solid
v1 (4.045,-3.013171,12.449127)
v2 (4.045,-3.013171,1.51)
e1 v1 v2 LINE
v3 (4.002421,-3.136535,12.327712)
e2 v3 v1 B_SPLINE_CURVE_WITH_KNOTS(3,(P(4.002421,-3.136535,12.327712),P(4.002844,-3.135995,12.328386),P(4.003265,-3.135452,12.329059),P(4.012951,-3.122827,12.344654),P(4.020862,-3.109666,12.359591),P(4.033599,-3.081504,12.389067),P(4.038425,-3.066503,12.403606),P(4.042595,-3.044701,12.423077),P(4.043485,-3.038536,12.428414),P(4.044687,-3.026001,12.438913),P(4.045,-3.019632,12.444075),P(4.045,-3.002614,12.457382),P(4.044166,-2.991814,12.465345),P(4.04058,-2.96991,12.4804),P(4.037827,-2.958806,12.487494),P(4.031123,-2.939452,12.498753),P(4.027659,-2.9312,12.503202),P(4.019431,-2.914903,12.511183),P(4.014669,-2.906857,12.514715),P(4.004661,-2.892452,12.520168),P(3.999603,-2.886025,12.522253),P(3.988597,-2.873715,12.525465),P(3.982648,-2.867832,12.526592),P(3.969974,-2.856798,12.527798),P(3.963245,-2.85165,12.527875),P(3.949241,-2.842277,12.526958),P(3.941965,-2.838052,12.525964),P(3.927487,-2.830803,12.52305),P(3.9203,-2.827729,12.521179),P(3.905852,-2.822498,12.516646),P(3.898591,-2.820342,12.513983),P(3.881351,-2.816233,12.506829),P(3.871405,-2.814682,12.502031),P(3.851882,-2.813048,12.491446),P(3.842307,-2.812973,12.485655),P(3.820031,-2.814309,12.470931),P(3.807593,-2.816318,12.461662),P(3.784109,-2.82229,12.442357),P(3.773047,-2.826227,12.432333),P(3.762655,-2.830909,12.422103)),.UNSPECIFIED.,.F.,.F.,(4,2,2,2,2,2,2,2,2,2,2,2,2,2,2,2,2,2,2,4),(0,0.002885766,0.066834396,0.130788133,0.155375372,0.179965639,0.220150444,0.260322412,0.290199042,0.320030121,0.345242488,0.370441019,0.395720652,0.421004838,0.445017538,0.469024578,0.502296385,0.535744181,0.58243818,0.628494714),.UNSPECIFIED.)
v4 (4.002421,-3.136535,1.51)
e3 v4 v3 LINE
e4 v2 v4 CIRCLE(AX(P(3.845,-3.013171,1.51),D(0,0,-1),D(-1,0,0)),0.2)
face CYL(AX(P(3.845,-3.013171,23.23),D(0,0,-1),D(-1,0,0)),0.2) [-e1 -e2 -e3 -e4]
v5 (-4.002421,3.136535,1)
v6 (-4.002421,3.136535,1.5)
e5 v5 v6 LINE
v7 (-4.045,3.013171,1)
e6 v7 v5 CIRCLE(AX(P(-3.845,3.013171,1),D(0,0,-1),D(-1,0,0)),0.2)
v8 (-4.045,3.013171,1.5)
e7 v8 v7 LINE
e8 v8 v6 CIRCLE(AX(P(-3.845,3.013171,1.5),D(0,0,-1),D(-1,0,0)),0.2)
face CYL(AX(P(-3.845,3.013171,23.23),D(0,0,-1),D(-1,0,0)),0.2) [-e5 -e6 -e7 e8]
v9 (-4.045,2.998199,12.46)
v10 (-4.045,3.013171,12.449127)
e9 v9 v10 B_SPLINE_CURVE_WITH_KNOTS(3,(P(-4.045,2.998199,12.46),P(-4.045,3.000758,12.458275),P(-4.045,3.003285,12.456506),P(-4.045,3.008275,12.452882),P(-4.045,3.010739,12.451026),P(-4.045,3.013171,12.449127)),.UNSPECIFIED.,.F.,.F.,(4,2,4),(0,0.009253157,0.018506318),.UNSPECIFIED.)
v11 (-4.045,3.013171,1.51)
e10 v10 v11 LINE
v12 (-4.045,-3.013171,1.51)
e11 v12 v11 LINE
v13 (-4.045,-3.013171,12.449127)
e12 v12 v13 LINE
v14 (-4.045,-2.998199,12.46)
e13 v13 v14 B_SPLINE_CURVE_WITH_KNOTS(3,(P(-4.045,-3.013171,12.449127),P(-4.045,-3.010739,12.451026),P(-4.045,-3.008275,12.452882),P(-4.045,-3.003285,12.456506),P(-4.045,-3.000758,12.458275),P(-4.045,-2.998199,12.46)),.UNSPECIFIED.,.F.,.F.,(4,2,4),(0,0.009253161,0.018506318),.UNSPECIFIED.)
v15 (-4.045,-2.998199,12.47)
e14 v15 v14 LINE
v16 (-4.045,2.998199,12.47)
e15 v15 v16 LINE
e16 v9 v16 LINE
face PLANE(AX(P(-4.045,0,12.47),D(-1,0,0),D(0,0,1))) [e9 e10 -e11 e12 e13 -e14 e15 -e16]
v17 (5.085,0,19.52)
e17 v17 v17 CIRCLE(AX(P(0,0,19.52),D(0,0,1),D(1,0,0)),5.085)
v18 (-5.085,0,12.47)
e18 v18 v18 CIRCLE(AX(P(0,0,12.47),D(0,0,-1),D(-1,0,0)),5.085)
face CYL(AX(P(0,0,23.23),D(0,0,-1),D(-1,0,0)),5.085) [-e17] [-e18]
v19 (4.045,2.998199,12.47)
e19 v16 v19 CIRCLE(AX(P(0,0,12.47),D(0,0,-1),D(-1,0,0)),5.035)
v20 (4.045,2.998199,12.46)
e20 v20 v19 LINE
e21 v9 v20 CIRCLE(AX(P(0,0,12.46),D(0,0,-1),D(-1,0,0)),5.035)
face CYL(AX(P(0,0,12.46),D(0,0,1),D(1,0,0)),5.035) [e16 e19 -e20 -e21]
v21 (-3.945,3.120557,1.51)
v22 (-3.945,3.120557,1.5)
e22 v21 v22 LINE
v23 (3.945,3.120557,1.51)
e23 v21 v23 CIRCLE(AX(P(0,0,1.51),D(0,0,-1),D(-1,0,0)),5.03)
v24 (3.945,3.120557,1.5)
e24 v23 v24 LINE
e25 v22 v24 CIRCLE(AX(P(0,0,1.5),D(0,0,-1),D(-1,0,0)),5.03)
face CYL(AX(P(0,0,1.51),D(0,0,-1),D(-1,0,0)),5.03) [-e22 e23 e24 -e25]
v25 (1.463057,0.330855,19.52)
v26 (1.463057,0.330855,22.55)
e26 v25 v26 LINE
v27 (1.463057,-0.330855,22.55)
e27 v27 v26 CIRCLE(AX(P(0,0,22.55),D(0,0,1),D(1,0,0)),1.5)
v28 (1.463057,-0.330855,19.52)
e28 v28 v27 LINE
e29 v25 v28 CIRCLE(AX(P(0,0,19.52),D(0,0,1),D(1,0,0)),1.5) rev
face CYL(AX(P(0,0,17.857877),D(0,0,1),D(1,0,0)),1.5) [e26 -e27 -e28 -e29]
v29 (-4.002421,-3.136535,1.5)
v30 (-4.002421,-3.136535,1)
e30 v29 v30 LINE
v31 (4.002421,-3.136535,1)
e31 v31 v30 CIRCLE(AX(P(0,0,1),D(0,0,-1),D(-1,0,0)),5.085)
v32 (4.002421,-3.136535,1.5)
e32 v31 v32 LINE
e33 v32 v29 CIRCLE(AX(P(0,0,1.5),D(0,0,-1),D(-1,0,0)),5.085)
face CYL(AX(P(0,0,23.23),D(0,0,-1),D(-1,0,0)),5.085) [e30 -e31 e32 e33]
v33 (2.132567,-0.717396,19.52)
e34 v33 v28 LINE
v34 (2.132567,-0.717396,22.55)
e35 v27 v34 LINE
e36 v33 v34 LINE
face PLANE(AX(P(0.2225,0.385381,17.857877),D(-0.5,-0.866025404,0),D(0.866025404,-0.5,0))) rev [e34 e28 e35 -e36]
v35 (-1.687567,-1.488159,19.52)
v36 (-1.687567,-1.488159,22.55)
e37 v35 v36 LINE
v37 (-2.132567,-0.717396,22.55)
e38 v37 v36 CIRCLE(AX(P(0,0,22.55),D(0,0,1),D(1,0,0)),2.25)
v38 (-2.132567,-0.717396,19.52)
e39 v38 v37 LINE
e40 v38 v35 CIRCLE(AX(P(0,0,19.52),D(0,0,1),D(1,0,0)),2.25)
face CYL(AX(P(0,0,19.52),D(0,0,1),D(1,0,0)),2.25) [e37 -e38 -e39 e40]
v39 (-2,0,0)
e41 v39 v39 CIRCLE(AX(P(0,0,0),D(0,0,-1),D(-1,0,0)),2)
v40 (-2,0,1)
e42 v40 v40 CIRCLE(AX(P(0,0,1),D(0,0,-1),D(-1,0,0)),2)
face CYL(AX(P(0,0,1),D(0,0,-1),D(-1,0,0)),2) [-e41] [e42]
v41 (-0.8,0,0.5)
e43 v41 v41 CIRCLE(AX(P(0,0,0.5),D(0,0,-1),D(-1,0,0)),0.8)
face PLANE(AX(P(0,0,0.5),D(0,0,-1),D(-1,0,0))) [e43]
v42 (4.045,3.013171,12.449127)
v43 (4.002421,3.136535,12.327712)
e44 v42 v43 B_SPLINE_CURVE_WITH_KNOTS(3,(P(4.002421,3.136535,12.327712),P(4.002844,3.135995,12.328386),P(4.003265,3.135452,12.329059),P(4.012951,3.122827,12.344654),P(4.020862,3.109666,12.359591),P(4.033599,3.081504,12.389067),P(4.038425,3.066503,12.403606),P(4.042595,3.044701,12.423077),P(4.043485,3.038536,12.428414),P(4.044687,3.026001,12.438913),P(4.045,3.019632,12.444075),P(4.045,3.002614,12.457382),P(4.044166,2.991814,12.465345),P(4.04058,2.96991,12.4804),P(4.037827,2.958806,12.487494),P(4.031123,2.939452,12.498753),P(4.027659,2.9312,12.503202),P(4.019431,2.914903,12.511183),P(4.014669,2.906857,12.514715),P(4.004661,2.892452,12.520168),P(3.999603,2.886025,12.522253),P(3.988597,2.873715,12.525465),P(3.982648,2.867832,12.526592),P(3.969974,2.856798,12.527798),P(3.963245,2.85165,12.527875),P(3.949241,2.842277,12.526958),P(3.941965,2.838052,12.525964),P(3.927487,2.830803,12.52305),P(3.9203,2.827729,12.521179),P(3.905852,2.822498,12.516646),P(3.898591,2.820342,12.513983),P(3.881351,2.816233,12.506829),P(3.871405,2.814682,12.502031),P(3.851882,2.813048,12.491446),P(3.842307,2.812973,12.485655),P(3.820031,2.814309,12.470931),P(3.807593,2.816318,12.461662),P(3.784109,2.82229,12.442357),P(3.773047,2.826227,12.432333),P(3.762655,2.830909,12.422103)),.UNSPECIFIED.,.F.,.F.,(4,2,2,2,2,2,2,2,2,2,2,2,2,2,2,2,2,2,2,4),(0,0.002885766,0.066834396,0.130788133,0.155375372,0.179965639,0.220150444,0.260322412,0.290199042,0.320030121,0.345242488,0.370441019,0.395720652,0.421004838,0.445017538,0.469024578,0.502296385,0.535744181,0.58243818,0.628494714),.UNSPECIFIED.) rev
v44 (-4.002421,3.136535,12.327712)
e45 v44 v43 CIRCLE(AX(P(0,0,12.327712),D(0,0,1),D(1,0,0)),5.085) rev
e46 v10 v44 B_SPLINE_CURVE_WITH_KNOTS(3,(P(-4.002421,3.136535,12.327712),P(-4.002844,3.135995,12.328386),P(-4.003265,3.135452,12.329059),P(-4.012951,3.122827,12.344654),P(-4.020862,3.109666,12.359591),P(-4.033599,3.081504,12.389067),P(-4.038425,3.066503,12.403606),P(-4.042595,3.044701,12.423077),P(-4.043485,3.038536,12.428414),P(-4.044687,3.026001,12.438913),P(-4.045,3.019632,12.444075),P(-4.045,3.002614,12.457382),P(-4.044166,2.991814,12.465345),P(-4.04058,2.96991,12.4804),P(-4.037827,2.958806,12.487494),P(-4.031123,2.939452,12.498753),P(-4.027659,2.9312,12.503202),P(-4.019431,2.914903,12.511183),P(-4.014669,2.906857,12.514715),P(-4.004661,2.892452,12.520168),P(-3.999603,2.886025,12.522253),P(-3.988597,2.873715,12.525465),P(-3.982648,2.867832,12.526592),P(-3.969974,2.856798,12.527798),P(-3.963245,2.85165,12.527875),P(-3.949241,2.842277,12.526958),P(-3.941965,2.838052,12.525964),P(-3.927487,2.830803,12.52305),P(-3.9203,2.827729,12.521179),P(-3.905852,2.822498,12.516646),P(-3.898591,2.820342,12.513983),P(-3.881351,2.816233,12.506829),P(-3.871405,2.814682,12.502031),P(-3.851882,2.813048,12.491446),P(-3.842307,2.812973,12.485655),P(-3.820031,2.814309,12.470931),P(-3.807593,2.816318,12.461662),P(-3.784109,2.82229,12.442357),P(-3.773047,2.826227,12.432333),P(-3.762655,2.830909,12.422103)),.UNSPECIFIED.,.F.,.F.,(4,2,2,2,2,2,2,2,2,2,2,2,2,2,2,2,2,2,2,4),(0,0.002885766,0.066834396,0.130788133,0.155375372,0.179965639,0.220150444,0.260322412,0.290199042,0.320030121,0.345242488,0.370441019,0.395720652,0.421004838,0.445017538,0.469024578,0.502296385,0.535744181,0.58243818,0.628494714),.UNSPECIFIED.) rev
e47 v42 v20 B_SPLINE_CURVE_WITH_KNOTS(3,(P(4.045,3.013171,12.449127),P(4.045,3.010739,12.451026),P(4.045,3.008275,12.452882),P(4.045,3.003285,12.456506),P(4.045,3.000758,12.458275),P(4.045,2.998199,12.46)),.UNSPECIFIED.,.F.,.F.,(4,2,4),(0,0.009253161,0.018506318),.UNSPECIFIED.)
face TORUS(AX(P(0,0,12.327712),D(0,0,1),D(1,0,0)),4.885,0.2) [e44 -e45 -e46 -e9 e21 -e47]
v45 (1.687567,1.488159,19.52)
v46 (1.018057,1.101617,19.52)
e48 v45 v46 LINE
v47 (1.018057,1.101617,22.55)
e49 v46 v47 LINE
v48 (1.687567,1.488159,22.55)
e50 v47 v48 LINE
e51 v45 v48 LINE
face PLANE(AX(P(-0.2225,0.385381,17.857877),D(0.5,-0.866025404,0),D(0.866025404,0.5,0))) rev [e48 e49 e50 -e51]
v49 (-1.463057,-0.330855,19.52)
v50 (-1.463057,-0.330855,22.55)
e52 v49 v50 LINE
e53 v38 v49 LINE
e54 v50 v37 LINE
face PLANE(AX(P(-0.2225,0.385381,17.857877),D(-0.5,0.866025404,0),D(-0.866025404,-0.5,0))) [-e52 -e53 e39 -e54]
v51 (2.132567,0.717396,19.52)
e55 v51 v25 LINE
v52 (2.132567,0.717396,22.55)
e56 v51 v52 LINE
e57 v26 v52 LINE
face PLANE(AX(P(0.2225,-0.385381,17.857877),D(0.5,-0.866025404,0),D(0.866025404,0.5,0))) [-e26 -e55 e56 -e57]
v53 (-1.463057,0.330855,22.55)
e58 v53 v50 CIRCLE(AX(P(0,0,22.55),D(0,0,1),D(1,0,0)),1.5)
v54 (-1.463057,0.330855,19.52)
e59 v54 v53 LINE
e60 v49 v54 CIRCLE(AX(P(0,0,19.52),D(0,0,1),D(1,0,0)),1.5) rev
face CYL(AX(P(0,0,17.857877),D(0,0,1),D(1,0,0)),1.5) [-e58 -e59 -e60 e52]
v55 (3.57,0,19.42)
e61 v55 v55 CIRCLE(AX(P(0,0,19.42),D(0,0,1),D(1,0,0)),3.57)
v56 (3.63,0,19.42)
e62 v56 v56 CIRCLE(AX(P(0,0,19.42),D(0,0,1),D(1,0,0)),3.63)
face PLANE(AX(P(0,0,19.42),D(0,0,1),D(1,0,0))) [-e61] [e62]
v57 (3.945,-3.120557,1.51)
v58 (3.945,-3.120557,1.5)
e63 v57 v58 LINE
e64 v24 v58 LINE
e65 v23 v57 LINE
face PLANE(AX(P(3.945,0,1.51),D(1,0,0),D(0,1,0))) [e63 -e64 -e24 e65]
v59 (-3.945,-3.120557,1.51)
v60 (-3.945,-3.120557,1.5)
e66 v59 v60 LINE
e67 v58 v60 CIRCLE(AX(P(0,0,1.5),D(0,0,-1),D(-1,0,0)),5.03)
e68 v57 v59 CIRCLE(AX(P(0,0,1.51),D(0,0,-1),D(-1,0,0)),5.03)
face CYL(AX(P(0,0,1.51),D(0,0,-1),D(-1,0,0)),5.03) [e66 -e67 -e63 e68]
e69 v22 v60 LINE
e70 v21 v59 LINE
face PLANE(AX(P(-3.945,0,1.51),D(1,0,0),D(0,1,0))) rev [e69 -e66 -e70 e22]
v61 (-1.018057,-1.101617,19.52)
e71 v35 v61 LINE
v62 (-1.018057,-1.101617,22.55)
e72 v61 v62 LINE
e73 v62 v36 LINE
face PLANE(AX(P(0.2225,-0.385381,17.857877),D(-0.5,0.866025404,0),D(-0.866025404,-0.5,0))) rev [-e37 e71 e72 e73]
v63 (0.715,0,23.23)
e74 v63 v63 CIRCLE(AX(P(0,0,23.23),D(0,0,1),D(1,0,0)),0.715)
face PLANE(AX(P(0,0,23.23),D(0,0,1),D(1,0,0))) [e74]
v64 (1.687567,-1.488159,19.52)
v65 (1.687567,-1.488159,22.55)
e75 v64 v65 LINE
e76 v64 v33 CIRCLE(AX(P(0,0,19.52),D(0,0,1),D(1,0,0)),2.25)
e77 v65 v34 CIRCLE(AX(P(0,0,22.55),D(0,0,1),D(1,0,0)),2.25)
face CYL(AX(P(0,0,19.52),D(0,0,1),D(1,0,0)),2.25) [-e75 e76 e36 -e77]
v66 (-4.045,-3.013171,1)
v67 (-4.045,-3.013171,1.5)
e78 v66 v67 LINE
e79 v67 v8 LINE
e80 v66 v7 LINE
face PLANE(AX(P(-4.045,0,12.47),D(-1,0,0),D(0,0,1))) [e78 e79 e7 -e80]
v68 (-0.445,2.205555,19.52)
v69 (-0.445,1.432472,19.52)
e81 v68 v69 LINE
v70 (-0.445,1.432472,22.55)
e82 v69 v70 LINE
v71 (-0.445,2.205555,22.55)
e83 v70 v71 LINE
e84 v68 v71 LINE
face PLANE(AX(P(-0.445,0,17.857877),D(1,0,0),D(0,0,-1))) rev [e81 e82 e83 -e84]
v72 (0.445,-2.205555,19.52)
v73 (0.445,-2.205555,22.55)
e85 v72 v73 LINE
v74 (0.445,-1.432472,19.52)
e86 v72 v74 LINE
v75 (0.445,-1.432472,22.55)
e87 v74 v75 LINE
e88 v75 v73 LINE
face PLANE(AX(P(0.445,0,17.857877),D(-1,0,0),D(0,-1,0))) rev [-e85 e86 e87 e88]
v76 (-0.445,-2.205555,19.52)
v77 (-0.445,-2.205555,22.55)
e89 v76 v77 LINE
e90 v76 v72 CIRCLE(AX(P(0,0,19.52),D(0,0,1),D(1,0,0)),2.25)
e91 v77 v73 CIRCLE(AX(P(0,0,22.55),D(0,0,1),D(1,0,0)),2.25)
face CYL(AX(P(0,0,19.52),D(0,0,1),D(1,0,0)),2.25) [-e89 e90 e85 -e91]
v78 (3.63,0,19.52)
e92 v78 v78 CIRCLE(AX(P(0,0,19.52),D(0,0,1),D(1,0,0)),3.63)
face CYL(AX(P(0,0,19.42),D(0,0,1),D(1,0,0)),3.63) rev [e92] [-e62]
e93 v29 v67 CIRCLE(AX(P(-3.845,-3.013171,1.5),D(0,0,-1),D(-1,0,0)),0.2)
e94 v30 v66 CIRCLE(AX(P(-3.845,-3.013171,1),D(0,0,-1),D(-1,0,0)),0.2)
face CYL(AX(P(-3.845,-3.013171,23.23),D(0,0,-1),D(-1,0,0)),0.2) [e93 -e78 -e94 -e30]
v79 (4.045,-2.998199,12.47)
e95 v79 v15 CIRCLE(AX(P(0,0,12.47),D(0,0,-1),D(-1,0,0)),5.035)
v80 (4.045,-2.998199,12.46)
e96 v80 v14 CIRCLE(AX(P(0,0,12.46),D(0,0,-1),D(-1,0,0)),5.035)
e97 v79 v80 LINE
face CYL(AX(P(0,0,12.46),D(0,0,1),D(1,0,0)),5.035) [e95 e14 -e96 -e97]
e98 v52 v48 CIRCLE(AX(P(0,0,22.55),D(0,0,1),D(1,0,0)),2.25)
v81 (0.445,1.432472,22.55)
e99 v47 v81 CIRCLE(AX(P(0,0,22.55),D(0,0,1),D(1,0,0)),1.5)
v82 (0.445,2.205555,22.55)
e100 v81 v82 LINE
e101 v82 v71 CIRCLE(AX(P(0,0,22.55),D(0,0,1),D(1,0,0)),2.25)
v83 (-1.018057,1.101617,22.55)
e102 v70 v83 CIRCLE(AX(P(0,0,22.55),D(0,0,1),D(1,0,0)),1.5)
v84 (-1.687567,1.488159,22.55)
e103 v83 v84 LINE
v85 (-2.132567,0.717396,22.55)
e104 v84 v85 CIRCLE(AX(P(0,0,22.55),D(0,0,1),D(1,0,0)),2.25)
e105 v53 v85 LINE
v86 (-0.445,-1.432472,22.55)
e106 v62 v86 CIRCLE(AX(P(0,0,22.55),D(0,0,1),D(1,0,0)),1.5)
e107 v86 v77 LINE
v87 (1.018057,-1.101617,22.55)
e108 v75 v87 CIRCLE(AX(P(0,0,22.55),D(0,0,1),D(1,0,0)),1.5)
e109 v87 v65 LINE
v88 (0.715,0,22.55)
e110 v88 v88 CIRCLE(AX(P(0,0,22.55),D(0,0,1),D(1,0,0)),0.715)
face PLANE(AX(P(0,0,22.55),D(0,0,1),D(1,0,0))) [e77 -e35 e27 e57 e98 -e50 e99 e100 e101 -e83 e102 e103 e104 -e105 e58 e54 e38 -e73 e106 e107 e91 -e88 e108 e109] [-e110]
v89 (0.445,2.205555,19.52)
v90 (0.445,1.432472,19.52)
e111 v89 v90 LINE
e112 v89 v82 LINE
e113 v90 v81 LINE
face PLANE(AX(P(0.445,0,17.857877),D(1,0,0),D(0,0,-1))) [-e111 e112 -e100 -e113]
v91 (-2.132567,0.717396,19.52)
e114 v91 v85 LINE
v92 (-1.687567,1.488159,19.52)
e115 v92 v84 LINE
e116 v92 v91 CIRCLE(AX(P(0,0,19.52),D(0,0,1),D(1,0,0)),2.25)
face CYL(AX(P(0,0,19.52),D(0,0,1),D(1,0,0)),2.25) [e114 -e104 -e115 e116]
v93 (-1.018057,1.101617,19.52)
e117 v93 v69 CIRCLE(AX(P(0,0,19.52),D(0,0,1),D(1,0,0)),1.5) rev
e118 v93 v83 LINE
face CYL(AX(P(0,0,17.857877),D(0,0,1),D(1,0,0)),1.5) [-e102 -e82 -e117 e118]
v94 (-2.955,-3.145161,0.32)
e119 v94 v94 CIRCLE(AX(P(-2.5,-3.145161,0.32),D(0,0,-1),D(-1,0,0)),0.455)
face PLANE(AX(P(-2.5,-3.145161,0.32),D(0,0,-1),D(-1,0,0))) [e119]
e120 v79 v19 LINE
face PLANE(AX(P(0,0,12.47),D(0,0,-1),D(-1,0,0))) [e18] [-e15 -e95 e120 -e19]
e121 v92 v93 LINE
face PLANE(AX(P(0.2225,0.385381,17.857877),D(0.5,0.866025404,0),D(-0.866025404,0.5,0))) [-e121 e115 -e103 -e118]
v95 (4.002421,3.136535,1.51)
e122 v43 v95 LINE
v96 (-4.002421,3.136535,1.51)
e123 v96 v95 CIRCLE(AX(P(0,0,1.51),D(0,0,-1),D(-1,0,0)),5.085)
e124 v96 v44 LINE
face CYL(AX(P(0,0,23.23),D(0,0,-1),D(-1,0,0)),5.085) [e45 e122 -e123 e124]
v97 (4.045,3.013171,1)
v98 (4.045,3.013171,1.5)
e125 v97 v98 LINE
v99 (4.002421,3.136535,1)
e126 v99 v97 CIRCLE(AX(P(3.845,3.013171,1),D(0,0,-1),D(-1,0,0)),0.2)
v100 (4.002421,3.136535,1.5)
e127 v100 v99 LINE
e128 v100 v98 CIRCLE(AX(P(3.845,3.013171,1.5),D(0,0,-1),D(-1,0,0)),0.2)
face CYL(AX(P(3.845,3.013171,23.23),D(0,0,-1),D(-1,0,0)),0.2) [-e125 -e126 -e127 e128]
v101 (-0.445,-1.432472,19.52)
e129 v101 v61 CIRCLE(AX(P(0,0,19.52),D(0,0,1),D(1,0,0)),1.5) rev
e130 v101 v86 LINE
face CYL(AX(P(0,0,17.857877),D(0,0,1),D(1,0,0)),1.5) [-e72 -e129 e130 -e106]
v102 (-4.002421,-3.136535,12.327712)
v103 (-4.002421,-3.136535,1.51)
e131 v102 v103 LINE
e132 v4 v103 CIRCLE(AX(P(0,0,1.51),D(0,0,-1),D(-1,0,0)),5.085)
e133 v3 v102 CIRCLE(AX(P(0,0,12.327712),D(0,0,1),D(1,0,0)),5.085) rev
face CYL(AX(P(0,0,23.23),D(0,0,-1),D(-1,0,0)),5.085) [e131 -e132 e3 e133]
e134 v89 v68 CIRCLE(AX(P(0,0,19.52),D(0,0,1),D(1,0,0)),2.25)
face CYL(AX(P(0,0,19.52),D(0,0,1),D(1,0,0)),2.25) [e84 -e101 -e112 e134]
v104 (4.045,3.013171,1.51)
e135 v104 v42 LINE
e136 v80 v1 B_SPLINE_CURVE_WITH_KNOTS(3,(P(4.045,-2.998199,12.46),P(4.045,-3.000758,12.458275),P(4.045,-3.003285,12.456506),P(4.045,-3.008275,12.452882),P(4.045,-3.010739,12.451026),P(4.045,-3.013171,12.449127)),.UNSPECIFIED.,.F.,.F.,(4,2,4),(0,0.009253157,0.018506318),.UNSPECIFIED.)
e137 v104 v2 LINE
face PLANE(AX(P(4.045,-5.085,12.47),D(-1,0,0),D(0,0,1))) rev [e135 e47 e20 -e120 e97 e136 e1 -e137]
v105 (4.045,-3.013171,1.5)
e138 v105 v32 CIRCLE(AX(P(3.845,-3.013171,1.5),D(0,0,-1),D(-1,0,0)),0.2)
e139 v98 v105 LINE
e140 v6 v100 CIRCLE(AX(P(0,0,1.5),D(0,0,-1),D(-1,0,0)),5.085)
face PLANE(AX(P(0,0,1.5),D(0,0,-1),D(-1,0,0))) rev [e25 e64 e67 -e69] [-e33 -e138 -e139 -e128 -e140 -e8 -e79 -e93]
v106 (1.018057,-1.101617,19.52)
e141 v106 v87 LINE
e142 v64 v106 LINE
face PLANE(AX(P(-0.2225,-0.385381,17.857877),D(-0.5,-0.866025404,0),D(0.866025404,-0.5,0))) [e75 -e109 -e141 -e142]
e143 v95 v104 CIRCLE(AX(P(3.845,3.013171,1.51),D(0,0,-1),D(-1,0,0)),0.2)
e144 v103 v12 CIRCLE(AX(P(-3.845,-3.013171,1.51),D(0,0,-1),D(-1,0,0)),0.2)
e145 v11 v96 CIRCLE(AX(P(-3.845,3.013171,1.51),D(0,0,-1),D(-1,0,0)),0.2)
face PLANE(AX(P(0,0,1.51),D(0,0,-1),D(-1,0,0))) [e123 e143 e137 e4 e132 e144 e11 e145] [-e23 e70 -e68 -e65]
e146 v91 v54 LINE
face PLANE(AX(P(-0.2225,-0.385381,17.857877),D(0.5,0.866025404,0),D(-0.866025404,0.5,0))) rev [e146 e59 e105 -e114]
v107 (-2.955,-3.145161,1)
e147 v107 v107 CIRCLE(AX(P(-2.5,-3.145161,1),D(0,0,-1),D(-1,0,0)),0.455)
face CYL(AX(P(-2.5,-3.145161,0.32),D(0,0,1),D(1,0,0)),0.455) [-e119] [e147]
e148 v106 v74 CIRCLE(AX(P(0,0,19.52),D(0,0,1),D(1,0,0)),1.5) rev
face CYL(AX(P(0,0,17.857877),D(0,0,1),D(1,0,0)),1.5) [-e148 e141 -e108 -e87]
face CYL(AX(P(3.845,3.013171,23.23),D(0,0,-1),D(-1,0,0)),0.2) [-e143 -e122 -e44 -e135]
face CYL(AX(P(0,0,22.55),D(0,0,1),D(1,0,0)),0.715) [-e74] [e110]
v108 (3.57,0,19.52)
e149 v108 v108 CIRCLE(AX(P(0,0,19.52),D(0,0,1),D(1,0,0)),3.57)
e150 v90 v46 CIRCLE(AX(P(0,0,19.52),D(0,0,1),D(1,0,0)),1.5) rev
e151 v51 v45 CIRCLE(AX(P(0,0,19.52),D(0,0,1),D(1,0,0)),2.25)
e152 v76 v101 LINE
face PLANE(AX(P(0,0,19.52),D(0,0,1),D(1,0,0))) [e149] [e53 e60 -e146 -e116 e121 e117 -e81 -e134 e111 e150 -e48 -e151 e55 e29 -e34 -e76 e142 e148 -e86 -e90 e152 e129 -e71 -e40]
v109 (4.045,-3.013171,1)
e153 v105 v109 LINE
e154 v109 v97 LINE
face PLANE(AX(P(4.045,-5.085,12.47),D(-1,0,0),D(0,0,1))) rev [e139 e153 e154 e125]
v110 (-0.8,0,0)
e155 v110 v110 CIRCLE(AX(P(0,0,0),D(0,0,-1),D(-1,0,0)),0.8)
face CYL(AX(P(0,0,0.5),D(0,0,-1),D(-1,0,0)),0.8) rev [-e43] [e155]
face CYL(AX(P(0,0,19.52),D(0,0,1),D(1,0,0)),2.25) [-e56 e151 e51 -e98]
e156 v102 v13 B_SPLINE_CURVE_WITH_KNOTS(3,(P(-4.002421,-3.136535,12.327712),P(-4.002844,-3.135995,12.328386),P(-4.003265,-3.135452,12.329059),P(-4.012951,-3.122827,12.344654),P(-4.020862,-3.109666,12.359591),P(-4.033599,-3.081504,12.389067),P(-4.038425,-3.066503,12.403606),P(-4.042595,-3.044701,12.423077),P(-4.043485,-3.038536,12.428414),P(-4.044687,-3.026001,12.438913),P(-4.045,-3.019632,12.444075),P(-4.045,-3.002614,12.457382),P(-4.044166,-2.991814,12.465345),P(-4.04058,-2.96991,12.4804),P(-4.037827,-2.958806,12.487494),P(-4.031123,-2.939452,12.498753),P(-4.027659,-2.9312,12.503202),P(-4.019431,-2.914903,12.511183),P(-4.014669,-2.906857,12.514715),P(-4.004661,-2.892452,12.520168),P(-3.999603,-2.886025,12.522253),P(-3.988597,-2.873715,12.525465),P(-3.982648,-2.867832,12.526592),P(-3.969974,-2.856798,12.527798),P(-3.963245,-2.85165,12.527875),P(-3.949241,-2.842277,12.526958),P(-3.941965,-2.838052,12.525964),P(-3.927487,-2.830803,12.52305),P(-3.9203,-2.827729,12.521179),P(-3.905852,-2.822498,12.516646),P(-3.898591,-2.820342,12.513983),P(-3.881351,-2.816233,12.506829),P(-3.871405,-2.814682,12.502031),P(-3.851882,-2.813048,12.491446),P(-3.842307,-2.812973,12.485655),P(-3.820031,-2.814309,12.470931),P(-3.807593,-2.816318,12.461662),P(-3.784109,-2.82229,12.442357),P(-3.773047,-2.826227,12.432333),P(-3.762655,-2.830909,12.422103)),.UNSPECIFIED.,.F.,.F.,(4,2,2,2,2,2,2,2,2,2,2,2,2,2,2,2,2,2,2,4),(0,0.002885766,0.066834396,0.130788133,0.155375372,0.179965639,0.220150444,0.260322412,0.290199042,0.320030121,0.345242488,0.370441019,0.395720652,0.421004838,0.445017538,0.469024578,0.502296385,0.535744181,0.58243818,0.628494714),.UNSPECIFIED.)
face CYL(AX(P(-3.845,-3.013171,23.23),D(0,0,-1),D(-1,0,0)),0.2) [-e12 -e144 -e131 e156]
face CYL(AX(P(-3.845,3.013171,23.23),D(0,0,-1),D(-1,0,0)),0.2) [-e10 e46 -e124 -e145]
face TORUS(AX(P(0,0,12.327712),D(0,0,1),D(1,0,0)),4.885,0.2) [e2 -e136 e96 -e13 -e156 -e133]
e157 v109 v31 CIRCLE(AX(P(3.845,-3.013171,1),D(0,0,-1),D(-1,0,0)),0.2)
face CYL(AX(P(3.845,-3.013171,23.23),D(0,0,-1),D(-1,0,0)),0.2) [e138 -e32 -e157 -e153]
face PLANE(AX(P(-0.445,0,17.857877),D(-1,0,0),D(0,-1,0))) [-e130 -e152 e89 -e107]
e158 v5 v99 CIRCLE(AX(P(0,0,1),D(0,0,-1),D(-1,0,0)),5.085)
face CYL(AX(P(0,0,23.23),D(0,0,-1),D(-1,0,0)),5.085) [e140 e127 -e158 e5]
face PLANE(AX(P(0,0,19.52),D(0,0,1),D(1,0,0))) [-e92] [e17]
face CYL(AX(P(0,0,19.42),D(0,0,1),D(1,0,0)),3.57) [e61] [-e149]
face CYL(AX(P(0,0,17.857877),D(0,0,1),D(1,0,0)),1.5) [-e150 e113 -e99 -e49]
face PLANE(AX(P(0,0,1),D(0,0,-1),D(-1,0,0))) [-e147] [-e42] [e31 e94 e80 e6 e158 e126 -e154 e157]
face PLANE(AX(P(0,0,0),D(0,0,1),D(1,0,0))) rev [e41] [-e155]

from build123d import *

# Parameters (mm, degrees)
SKETCH1_R           = 5.085
BOSS_EXTRUDE1_DEPTH = 23.23
SKETCH2_R           = 5.085
SKETCH2_R_2         = 2
CUT_EXTRUDE1_DEPTH  = 1
SKETCH4_R           = 0.8
CUT_EXTRUDE2_DEPTH  = 0.5
SKETCH5_W           = 3.99879876
SKETCH5_H           = 10.17
SKETCH5_W_2         = 3.491908776
CUT_EXTRUDE3_DEPTH  = 12.47
CUT_EXTRUDE4_START  = -3.71
SKETCH6_R           = 5.085
SKETCH6_R_2         = 2.25
CUT_EXTRUDE4_DEPTH  = 3.71
SKETCH7_R           = 3.63
SKETCH7_R_2         = 3.57
CUT_EXTRUDE5_DEPTH  = 0.1
CUT_EXTRUDE6_START  = -0.68
SKETCH8_R           = 2.25
SKETCH8_R_2         = 0.715
CUT_EXTRUDE6_DEPTH  = 0.68
CUT_EXTRUDE7_START  = -3.03
CUT_EXTRUDE7_DEPTH  = 3.03
SKETCH10_R          = 0.455
BOSS_EXTRUDE2_DEPTH = 0.68
CUT_EXTRUDE8_START  = 0.01
SKETCH11_R          = 5.085
SKETCH11_R_2        = 5.035
CUT_EXTRUDE8_DEPTH  = 0.01
FILLET3_R           = 0.2
CUT_EXTRUDE9_DEPTH  = 0.01


with BuildPart() as part:
    # Sketch1 → Boss-Extrude1 (new body)
    with BuildSketch(Plane.XY):
        Circle(SKETCH1_R)
    extrude(amount=BOSS_EXTRUDE1_DEPTH)

    # Sketch2 → Cut-Extrude1 (cut)
    with BuildSketch(Plane(origin=(0, 0, 0), x_dir=(-1, 0, 0), z_dir=(0, 0, -1))):
        Circle(SKETCH2_R)
        Circle(SKETCH2_R_2, mode=Mode.SUBTRACT)
    extrude(amount=-CUT_EXTRUDE1_DEPTH, mode=Mode.SUBTRACT)

    # Sketch4 → Cut-Extrude2 (cut)
    with BuildSketch(Plane(origin=(0, 0, 0), x_dir=(-1, 0, 0), z_dir=(0, 0, -1))):
        Circle(SKETCH4_R)
    extrude(amount=-CUT_EXTRUDE2_DEPTH, mode=Mode.SUBTRACT)

    # Sketch5 → Cut-Extrude3 (cut)
    with BuildSketch(Plane(origin=(0, 0, 0), x_dir=(-1, 0, 0), z_dir=(0, 0, -1))):
        with Locations((6.04439938, 0)):
            Rectangle(SKETCH5_W, SKETCH5_H)
        with Locations((-5.790954388, 0)):
            Rectangle(SKETCH5_W_2, SKETCH5_H)
    extrude(amount=-CUT_EXTRUDE3_DEPTH, mode=Mode.SUBTRACT)

    # Sketch6 → Cut-Extrude4 (cut)
    with BuildSketch(Plane.XY.offset(23.23).offset(CUT_EXTRUDE4_START)):
        with Locations(Location((0, 0, 0), (0, 0, 142.7003226))):
            Circle(SKETCH6_R)
        Circle(SKETCH6_R_2, mode=Mode.SUBTRACT)
    extrude(amount=CUT_EXTRUDE4_DEPTH, mode=Mode.SUBTRACT)

    # Sketch7 → Cut-Extrude5 (cut)
    with BuildSketch(Plane.XY.offset(19.52)):
        Circle(SKETCH7_R)
        Circle(SKETCH7_R_2, mode=Mode.SUBTRACT)
    extrude(amount=-CUT_EXTRUDE5_DEPTH, mode=Mode.SUBTRACT)

    # Sketch8 → Cut-Extrude6 (cut)
    with BuildSketch(Plane.XY.offset(23.23).offset(CUT_EXTRUDE6_START)):
        Circle(SKETCH8_R)
        Circle(SKETCH8_R_2, mode=Mode.SUBTRACT)
    extrude(amount=CUT_EXTRUDE6_DEPTH, mode=Mode.SUBTRACT)

    # Sketch9 → Cut-Extrude7 (cut)
    with BuildSketch(Plane.XY.offset(22.55).offset(CUT_EXTRUDE7_START)):
        with BuildLine():
            ThreePointArc((-1.018056831, 1.101617125), (-0.75, 1.299038106), (-0.445, 1.43247164))
            Line((-0.445, 1.43247164), (-0.445, 2.205555486))
            ThreePointArc((-0.445, 2.205555486), (-1.125, 1.948557159), (-1.68756708, 1.488159047))
            Line((-1.68756708, 1.488159047), (-1.018056831, 1.101617125))
        make_face()
        with BuildLine():
            Line((0.445, 2.205555486), (0.445, 1.43247164))
            ThreePointArc((0.445, 1.43247164), (0.75, 1.299038106), (1.018056831, 1.101617125))
            Line((1.018056831, 1.101617125), (1.68756708, 1.488159047))
            ThreePointArc((1.68756708, 1.488159047), (1.125, 1.948557159), (0.445, 2.205555486))
        make_face()
        with BuildLine():
            Line((2.13256708, 0.717396438), (1.463056831, 0.330854515))
            ThreePointArc((1.463056831, 0.330854515), (1.490735598, 0.16645533), (1.5, 0))
            ThreePointArc((1.5, 0), (1.490735598, -0.16645533), (1.463056831, -0.330854515))
            Line((1.463056831, -0.330854515), (2.13256708, -0.717396438))
            ThreePointArc((2.13256708, -0.717396438), (2.220447695, -0.363472193), (2.25, 0))
            ThreePointArc((2.25, 0), (2.220447695, 0.363472193), (2.13256708, 0.717396438))
        make_face()
        with BuildLine():
            Line((1.68756708, -1.488159047), (1.018056831, -1.101617125))
            ThreePointArc((1.018056831, -1.101617125), (0.75, -1.299038106), (0.445, -1.43247164))
            Line((0.445, -1.43247164), (0.445, -2.205555486))
            ThreePointArc((0.445, -2.205555486), (1.125, -1.948557159), (1.68756708, -1.488159047))
        make_face()
        with BuildLine():
            ThreePointArc((-0.445, -1.43247164), (-0.75, -1.299038106), (-1.018056831, -1.101617125))
            Line((-1.018056831, -1.101617125), (-1.68756708, -1.488159047))
            ThreePointArc((-1.68756708, -1.488159047), (-1.125, -1.948557159), (-0.445, -2.205555486))
            Line((-0.445, -2.205555486), (-0.445, -1.43247164))
        make_face()
        with BuildLine():
            ThreePointArc((-1.463056831, -0.330854515), (-1.5, 0), (-1.463056831, 0.330854515))
            Line((-1.463056831, 0.330854515), (-2.13256708, 0.717396438))
            ThreePointArc((-2.13256708, 0.717396438), (-2.25, 0), (-2.13256708, -0.717396438))
            Line((-2.13256708, -0.717396438), (-1.463056831, -0.330854515))
        make_face()
    extrude(amount=CUT_EXTRUDE7_DEPTH, mode=Mode.SUBTRACT)

    # Sketch10 → Boss-Extrude2 (add)
    with BuildSketch(Plane(origin=(0, 0, 1), x_dir=(-1, 0, 0), z_dir=(0, 0, -1))):
        with Locations((2.5, -3.145160742)):
            Circle(SKETCH10_R)
    extrude(amount=BOSS_EXTRUDE2_DEPTH)

    # Sketch11 → Cut-Extrude8 (cut)
    with BuildSketch(Plane(origin=(0, 0, 12.47), x_dir=(-1, 0, 0), z_dir=(0, 0, -1)).offset(CUT_EXTRUDE8_START)):
        Circle(SKETCH11_R)
        Circle(SKETCH11_R_2, mode=Mode.SUBTRACT)
    extrude(amount=-CUT_EXTRUDE8_DEPTH, mode=Mode.SUBTRACT)

    # Fillet3
    # the kernel refuses this fillet: 0.2 mm, written as the material it takes off along each edge
    with BuildSketch(Plane(origin=(0, 0, 12.46), x_dir=(-0.8331991700608187, 0.5529730038708609, 0), z_dir=(-0.5529730038708609, -0.8331991700608187, 0))) as fillet3_piece_1:
        with BuildLine():
            CenterArc((4.885, 0.132287566), FILLET3_R, 318.590377891, 41.409622109)
            Line((5.035, 0), (5.085, 0))
            Line((5.085, 0), (5.085, 0.132287566))
        make_face()
    fillet3_piece_1_solid = revolve(axis=Axis((0, 0, 12.46), (0, 0, -1)), revolution_arc=112.857572989, mode=Mode.PRIVATE)
    with BuildSketch(Plane(origin=(0, 0, 12.46), x_dir=(0.8331991700608224, -0.5529730038708549, 0), z_dir=(0.5529730038708549, 0.8331991700608224, 0))) as fillet3_piece_2:
        with BuildLine():
            CenterArc((4.885, 0.132287566), FILLET3_R, 318.590377891, 41.409622109)
            Line((5.085, 0.132287566), (5.085, 0))
            Line((5.085, 0), (5.035, 0))
        make_face()
    fillet3_piece_2_solid = revolve(axis=Axis((0, 0, 12.46), (0, 0, -1)), revolution_arc=112.857572989, mode=Mode.PRIVATE)
    with BuildSketch(Plane(origin=(-4.045, 3.08142824, 12.46), x_dir=(0.6114168469415571, 0.7913086877294123, 0), z_dir=(0, 0, -1))) as fillet3_piece_3:
        with BuildLine():
            CenterArc((0.068270891, 0.199995311), FILLET3_R, 232.307979121, 38.084364359)
            Line((-0.054012478, 0.041733573), (0, 0))
            ThreePointArc((0, 0), (0.034820209, -0.000119219), (0.069640417, 0))
        make_face()
    fillet3_piece_3_solid = extrude(amount=11.634101044, mode=Mode.PRIVATE)
    with BuildSketch(Plane(origin=(-4.045, -3.08142824, 12.46), x_dir=(0.6114168469415588, -0.7913086877294109, 0), z_dir=(0, 0, -1)), Plane(origin=(4.045, 3.08142824, 12.46), x_dir=(-0.6114168469415571, 0.7913086877294123, 0), z_dir=(0, 0, -1))) as fillet3_piece_4:
        with BuildLine():
            CenterArc((0.068270891, -0.199995311), FILLET3_R, 89.60765652, 38.084364359)
            Line((-0.054012478, -0.041733573), (0, 0))
            ThreePointArc((0, 0), (0.034820209, 0.000119219), (0.069640417, 0))
        make_face()
    fillet3_piece_4_solid = extrude(amount=11.634101044, mode=Mode.PRIVATE)
    with BuildSketch(Plane(origin=(4.045, -3.08142824, 12.46), x_dir=(0, 1, 0), z_dir=(0, 0, -1))) as fillet3_piece_5:
        with BuildLine():
            CenterArc((0.068257153, -0.2), FILLET3_R, 90, 38.084364359)
            ThreePointArc((-0.055107067, -0.042579324), (-0.027626426, -0.021195323), (0, 0))
            Line((0, 0), (0.068257153, 0))
        make_face()
    fillet3_piece_5_solid = extrude(amount=11.634101044, mode=Mode.PRIVATE)
    add([fillet3_piece_1_solid, fillet3_piece_2_solid, fillet3_piece_3_solid, fillet3_piece_4_solid, fillet3_piece_5_solid], mode=Mode.SUBTRACT)

    # Sketch15 → Cut-Extrude9 (cut)
    with BuildSketch(Plane(origin=(0, 0, 1.5), x_dir=(-1, 0, 0), z_dir=(0, 0, -1))):
        with BuildLine():
            Line((4.045, -3.013171087), (4.045, 3.013171087))
            ThreePointArc((4.045, 3.013171087), (4.034055726, 3.078423922), (4.002420676, 3.136535308))
            ThreePointArc((4.002420676, 3.136535308), (0, 5.085), (-4.002420676, 3.136535308))
            ThreePointArc((-4.002420676, 3.136535308), (-4.034055726, 3.078423922), (-4.045, 3.013171087))
            Line((-4.045, 3.013171087), (-4.045, -3.013171087))
            ThreePointArc((-4.045, -3.013171087), (-4.034055726, -3.078423922), (-4.002420676, -3.136535308))
            ThreePointArc((-4.002420676, -3.136535308), (0, -5.085), (4.002420676, -3.136535308))
            ThreePointArc((4.002420676, -3.136535308), (4.034055726, -3.078423922), (4.045, -3.013171087))
        make_face()
        with BuildLine():
            Line((-3.945, 3.120556841), (-3.945, -3.120556841))
            ThreePointArc((-3.945, -3.120556841), (0, -5.03), (3.945, -3.120556841))
            Line((3.945, -3.120556841), (3.945, 3.120556841))
            ThreePointArc((3.945, 3.120556841), (-0.000264914, 5.029999993), (-3.945, 3.120556841))
        make_face(mode=Mode.SUBTRACT)
    extrude(amount=-CUT_EXTRUDE9_DEPTH, mode=Mode.SUBTRACT)


solid = part.part
